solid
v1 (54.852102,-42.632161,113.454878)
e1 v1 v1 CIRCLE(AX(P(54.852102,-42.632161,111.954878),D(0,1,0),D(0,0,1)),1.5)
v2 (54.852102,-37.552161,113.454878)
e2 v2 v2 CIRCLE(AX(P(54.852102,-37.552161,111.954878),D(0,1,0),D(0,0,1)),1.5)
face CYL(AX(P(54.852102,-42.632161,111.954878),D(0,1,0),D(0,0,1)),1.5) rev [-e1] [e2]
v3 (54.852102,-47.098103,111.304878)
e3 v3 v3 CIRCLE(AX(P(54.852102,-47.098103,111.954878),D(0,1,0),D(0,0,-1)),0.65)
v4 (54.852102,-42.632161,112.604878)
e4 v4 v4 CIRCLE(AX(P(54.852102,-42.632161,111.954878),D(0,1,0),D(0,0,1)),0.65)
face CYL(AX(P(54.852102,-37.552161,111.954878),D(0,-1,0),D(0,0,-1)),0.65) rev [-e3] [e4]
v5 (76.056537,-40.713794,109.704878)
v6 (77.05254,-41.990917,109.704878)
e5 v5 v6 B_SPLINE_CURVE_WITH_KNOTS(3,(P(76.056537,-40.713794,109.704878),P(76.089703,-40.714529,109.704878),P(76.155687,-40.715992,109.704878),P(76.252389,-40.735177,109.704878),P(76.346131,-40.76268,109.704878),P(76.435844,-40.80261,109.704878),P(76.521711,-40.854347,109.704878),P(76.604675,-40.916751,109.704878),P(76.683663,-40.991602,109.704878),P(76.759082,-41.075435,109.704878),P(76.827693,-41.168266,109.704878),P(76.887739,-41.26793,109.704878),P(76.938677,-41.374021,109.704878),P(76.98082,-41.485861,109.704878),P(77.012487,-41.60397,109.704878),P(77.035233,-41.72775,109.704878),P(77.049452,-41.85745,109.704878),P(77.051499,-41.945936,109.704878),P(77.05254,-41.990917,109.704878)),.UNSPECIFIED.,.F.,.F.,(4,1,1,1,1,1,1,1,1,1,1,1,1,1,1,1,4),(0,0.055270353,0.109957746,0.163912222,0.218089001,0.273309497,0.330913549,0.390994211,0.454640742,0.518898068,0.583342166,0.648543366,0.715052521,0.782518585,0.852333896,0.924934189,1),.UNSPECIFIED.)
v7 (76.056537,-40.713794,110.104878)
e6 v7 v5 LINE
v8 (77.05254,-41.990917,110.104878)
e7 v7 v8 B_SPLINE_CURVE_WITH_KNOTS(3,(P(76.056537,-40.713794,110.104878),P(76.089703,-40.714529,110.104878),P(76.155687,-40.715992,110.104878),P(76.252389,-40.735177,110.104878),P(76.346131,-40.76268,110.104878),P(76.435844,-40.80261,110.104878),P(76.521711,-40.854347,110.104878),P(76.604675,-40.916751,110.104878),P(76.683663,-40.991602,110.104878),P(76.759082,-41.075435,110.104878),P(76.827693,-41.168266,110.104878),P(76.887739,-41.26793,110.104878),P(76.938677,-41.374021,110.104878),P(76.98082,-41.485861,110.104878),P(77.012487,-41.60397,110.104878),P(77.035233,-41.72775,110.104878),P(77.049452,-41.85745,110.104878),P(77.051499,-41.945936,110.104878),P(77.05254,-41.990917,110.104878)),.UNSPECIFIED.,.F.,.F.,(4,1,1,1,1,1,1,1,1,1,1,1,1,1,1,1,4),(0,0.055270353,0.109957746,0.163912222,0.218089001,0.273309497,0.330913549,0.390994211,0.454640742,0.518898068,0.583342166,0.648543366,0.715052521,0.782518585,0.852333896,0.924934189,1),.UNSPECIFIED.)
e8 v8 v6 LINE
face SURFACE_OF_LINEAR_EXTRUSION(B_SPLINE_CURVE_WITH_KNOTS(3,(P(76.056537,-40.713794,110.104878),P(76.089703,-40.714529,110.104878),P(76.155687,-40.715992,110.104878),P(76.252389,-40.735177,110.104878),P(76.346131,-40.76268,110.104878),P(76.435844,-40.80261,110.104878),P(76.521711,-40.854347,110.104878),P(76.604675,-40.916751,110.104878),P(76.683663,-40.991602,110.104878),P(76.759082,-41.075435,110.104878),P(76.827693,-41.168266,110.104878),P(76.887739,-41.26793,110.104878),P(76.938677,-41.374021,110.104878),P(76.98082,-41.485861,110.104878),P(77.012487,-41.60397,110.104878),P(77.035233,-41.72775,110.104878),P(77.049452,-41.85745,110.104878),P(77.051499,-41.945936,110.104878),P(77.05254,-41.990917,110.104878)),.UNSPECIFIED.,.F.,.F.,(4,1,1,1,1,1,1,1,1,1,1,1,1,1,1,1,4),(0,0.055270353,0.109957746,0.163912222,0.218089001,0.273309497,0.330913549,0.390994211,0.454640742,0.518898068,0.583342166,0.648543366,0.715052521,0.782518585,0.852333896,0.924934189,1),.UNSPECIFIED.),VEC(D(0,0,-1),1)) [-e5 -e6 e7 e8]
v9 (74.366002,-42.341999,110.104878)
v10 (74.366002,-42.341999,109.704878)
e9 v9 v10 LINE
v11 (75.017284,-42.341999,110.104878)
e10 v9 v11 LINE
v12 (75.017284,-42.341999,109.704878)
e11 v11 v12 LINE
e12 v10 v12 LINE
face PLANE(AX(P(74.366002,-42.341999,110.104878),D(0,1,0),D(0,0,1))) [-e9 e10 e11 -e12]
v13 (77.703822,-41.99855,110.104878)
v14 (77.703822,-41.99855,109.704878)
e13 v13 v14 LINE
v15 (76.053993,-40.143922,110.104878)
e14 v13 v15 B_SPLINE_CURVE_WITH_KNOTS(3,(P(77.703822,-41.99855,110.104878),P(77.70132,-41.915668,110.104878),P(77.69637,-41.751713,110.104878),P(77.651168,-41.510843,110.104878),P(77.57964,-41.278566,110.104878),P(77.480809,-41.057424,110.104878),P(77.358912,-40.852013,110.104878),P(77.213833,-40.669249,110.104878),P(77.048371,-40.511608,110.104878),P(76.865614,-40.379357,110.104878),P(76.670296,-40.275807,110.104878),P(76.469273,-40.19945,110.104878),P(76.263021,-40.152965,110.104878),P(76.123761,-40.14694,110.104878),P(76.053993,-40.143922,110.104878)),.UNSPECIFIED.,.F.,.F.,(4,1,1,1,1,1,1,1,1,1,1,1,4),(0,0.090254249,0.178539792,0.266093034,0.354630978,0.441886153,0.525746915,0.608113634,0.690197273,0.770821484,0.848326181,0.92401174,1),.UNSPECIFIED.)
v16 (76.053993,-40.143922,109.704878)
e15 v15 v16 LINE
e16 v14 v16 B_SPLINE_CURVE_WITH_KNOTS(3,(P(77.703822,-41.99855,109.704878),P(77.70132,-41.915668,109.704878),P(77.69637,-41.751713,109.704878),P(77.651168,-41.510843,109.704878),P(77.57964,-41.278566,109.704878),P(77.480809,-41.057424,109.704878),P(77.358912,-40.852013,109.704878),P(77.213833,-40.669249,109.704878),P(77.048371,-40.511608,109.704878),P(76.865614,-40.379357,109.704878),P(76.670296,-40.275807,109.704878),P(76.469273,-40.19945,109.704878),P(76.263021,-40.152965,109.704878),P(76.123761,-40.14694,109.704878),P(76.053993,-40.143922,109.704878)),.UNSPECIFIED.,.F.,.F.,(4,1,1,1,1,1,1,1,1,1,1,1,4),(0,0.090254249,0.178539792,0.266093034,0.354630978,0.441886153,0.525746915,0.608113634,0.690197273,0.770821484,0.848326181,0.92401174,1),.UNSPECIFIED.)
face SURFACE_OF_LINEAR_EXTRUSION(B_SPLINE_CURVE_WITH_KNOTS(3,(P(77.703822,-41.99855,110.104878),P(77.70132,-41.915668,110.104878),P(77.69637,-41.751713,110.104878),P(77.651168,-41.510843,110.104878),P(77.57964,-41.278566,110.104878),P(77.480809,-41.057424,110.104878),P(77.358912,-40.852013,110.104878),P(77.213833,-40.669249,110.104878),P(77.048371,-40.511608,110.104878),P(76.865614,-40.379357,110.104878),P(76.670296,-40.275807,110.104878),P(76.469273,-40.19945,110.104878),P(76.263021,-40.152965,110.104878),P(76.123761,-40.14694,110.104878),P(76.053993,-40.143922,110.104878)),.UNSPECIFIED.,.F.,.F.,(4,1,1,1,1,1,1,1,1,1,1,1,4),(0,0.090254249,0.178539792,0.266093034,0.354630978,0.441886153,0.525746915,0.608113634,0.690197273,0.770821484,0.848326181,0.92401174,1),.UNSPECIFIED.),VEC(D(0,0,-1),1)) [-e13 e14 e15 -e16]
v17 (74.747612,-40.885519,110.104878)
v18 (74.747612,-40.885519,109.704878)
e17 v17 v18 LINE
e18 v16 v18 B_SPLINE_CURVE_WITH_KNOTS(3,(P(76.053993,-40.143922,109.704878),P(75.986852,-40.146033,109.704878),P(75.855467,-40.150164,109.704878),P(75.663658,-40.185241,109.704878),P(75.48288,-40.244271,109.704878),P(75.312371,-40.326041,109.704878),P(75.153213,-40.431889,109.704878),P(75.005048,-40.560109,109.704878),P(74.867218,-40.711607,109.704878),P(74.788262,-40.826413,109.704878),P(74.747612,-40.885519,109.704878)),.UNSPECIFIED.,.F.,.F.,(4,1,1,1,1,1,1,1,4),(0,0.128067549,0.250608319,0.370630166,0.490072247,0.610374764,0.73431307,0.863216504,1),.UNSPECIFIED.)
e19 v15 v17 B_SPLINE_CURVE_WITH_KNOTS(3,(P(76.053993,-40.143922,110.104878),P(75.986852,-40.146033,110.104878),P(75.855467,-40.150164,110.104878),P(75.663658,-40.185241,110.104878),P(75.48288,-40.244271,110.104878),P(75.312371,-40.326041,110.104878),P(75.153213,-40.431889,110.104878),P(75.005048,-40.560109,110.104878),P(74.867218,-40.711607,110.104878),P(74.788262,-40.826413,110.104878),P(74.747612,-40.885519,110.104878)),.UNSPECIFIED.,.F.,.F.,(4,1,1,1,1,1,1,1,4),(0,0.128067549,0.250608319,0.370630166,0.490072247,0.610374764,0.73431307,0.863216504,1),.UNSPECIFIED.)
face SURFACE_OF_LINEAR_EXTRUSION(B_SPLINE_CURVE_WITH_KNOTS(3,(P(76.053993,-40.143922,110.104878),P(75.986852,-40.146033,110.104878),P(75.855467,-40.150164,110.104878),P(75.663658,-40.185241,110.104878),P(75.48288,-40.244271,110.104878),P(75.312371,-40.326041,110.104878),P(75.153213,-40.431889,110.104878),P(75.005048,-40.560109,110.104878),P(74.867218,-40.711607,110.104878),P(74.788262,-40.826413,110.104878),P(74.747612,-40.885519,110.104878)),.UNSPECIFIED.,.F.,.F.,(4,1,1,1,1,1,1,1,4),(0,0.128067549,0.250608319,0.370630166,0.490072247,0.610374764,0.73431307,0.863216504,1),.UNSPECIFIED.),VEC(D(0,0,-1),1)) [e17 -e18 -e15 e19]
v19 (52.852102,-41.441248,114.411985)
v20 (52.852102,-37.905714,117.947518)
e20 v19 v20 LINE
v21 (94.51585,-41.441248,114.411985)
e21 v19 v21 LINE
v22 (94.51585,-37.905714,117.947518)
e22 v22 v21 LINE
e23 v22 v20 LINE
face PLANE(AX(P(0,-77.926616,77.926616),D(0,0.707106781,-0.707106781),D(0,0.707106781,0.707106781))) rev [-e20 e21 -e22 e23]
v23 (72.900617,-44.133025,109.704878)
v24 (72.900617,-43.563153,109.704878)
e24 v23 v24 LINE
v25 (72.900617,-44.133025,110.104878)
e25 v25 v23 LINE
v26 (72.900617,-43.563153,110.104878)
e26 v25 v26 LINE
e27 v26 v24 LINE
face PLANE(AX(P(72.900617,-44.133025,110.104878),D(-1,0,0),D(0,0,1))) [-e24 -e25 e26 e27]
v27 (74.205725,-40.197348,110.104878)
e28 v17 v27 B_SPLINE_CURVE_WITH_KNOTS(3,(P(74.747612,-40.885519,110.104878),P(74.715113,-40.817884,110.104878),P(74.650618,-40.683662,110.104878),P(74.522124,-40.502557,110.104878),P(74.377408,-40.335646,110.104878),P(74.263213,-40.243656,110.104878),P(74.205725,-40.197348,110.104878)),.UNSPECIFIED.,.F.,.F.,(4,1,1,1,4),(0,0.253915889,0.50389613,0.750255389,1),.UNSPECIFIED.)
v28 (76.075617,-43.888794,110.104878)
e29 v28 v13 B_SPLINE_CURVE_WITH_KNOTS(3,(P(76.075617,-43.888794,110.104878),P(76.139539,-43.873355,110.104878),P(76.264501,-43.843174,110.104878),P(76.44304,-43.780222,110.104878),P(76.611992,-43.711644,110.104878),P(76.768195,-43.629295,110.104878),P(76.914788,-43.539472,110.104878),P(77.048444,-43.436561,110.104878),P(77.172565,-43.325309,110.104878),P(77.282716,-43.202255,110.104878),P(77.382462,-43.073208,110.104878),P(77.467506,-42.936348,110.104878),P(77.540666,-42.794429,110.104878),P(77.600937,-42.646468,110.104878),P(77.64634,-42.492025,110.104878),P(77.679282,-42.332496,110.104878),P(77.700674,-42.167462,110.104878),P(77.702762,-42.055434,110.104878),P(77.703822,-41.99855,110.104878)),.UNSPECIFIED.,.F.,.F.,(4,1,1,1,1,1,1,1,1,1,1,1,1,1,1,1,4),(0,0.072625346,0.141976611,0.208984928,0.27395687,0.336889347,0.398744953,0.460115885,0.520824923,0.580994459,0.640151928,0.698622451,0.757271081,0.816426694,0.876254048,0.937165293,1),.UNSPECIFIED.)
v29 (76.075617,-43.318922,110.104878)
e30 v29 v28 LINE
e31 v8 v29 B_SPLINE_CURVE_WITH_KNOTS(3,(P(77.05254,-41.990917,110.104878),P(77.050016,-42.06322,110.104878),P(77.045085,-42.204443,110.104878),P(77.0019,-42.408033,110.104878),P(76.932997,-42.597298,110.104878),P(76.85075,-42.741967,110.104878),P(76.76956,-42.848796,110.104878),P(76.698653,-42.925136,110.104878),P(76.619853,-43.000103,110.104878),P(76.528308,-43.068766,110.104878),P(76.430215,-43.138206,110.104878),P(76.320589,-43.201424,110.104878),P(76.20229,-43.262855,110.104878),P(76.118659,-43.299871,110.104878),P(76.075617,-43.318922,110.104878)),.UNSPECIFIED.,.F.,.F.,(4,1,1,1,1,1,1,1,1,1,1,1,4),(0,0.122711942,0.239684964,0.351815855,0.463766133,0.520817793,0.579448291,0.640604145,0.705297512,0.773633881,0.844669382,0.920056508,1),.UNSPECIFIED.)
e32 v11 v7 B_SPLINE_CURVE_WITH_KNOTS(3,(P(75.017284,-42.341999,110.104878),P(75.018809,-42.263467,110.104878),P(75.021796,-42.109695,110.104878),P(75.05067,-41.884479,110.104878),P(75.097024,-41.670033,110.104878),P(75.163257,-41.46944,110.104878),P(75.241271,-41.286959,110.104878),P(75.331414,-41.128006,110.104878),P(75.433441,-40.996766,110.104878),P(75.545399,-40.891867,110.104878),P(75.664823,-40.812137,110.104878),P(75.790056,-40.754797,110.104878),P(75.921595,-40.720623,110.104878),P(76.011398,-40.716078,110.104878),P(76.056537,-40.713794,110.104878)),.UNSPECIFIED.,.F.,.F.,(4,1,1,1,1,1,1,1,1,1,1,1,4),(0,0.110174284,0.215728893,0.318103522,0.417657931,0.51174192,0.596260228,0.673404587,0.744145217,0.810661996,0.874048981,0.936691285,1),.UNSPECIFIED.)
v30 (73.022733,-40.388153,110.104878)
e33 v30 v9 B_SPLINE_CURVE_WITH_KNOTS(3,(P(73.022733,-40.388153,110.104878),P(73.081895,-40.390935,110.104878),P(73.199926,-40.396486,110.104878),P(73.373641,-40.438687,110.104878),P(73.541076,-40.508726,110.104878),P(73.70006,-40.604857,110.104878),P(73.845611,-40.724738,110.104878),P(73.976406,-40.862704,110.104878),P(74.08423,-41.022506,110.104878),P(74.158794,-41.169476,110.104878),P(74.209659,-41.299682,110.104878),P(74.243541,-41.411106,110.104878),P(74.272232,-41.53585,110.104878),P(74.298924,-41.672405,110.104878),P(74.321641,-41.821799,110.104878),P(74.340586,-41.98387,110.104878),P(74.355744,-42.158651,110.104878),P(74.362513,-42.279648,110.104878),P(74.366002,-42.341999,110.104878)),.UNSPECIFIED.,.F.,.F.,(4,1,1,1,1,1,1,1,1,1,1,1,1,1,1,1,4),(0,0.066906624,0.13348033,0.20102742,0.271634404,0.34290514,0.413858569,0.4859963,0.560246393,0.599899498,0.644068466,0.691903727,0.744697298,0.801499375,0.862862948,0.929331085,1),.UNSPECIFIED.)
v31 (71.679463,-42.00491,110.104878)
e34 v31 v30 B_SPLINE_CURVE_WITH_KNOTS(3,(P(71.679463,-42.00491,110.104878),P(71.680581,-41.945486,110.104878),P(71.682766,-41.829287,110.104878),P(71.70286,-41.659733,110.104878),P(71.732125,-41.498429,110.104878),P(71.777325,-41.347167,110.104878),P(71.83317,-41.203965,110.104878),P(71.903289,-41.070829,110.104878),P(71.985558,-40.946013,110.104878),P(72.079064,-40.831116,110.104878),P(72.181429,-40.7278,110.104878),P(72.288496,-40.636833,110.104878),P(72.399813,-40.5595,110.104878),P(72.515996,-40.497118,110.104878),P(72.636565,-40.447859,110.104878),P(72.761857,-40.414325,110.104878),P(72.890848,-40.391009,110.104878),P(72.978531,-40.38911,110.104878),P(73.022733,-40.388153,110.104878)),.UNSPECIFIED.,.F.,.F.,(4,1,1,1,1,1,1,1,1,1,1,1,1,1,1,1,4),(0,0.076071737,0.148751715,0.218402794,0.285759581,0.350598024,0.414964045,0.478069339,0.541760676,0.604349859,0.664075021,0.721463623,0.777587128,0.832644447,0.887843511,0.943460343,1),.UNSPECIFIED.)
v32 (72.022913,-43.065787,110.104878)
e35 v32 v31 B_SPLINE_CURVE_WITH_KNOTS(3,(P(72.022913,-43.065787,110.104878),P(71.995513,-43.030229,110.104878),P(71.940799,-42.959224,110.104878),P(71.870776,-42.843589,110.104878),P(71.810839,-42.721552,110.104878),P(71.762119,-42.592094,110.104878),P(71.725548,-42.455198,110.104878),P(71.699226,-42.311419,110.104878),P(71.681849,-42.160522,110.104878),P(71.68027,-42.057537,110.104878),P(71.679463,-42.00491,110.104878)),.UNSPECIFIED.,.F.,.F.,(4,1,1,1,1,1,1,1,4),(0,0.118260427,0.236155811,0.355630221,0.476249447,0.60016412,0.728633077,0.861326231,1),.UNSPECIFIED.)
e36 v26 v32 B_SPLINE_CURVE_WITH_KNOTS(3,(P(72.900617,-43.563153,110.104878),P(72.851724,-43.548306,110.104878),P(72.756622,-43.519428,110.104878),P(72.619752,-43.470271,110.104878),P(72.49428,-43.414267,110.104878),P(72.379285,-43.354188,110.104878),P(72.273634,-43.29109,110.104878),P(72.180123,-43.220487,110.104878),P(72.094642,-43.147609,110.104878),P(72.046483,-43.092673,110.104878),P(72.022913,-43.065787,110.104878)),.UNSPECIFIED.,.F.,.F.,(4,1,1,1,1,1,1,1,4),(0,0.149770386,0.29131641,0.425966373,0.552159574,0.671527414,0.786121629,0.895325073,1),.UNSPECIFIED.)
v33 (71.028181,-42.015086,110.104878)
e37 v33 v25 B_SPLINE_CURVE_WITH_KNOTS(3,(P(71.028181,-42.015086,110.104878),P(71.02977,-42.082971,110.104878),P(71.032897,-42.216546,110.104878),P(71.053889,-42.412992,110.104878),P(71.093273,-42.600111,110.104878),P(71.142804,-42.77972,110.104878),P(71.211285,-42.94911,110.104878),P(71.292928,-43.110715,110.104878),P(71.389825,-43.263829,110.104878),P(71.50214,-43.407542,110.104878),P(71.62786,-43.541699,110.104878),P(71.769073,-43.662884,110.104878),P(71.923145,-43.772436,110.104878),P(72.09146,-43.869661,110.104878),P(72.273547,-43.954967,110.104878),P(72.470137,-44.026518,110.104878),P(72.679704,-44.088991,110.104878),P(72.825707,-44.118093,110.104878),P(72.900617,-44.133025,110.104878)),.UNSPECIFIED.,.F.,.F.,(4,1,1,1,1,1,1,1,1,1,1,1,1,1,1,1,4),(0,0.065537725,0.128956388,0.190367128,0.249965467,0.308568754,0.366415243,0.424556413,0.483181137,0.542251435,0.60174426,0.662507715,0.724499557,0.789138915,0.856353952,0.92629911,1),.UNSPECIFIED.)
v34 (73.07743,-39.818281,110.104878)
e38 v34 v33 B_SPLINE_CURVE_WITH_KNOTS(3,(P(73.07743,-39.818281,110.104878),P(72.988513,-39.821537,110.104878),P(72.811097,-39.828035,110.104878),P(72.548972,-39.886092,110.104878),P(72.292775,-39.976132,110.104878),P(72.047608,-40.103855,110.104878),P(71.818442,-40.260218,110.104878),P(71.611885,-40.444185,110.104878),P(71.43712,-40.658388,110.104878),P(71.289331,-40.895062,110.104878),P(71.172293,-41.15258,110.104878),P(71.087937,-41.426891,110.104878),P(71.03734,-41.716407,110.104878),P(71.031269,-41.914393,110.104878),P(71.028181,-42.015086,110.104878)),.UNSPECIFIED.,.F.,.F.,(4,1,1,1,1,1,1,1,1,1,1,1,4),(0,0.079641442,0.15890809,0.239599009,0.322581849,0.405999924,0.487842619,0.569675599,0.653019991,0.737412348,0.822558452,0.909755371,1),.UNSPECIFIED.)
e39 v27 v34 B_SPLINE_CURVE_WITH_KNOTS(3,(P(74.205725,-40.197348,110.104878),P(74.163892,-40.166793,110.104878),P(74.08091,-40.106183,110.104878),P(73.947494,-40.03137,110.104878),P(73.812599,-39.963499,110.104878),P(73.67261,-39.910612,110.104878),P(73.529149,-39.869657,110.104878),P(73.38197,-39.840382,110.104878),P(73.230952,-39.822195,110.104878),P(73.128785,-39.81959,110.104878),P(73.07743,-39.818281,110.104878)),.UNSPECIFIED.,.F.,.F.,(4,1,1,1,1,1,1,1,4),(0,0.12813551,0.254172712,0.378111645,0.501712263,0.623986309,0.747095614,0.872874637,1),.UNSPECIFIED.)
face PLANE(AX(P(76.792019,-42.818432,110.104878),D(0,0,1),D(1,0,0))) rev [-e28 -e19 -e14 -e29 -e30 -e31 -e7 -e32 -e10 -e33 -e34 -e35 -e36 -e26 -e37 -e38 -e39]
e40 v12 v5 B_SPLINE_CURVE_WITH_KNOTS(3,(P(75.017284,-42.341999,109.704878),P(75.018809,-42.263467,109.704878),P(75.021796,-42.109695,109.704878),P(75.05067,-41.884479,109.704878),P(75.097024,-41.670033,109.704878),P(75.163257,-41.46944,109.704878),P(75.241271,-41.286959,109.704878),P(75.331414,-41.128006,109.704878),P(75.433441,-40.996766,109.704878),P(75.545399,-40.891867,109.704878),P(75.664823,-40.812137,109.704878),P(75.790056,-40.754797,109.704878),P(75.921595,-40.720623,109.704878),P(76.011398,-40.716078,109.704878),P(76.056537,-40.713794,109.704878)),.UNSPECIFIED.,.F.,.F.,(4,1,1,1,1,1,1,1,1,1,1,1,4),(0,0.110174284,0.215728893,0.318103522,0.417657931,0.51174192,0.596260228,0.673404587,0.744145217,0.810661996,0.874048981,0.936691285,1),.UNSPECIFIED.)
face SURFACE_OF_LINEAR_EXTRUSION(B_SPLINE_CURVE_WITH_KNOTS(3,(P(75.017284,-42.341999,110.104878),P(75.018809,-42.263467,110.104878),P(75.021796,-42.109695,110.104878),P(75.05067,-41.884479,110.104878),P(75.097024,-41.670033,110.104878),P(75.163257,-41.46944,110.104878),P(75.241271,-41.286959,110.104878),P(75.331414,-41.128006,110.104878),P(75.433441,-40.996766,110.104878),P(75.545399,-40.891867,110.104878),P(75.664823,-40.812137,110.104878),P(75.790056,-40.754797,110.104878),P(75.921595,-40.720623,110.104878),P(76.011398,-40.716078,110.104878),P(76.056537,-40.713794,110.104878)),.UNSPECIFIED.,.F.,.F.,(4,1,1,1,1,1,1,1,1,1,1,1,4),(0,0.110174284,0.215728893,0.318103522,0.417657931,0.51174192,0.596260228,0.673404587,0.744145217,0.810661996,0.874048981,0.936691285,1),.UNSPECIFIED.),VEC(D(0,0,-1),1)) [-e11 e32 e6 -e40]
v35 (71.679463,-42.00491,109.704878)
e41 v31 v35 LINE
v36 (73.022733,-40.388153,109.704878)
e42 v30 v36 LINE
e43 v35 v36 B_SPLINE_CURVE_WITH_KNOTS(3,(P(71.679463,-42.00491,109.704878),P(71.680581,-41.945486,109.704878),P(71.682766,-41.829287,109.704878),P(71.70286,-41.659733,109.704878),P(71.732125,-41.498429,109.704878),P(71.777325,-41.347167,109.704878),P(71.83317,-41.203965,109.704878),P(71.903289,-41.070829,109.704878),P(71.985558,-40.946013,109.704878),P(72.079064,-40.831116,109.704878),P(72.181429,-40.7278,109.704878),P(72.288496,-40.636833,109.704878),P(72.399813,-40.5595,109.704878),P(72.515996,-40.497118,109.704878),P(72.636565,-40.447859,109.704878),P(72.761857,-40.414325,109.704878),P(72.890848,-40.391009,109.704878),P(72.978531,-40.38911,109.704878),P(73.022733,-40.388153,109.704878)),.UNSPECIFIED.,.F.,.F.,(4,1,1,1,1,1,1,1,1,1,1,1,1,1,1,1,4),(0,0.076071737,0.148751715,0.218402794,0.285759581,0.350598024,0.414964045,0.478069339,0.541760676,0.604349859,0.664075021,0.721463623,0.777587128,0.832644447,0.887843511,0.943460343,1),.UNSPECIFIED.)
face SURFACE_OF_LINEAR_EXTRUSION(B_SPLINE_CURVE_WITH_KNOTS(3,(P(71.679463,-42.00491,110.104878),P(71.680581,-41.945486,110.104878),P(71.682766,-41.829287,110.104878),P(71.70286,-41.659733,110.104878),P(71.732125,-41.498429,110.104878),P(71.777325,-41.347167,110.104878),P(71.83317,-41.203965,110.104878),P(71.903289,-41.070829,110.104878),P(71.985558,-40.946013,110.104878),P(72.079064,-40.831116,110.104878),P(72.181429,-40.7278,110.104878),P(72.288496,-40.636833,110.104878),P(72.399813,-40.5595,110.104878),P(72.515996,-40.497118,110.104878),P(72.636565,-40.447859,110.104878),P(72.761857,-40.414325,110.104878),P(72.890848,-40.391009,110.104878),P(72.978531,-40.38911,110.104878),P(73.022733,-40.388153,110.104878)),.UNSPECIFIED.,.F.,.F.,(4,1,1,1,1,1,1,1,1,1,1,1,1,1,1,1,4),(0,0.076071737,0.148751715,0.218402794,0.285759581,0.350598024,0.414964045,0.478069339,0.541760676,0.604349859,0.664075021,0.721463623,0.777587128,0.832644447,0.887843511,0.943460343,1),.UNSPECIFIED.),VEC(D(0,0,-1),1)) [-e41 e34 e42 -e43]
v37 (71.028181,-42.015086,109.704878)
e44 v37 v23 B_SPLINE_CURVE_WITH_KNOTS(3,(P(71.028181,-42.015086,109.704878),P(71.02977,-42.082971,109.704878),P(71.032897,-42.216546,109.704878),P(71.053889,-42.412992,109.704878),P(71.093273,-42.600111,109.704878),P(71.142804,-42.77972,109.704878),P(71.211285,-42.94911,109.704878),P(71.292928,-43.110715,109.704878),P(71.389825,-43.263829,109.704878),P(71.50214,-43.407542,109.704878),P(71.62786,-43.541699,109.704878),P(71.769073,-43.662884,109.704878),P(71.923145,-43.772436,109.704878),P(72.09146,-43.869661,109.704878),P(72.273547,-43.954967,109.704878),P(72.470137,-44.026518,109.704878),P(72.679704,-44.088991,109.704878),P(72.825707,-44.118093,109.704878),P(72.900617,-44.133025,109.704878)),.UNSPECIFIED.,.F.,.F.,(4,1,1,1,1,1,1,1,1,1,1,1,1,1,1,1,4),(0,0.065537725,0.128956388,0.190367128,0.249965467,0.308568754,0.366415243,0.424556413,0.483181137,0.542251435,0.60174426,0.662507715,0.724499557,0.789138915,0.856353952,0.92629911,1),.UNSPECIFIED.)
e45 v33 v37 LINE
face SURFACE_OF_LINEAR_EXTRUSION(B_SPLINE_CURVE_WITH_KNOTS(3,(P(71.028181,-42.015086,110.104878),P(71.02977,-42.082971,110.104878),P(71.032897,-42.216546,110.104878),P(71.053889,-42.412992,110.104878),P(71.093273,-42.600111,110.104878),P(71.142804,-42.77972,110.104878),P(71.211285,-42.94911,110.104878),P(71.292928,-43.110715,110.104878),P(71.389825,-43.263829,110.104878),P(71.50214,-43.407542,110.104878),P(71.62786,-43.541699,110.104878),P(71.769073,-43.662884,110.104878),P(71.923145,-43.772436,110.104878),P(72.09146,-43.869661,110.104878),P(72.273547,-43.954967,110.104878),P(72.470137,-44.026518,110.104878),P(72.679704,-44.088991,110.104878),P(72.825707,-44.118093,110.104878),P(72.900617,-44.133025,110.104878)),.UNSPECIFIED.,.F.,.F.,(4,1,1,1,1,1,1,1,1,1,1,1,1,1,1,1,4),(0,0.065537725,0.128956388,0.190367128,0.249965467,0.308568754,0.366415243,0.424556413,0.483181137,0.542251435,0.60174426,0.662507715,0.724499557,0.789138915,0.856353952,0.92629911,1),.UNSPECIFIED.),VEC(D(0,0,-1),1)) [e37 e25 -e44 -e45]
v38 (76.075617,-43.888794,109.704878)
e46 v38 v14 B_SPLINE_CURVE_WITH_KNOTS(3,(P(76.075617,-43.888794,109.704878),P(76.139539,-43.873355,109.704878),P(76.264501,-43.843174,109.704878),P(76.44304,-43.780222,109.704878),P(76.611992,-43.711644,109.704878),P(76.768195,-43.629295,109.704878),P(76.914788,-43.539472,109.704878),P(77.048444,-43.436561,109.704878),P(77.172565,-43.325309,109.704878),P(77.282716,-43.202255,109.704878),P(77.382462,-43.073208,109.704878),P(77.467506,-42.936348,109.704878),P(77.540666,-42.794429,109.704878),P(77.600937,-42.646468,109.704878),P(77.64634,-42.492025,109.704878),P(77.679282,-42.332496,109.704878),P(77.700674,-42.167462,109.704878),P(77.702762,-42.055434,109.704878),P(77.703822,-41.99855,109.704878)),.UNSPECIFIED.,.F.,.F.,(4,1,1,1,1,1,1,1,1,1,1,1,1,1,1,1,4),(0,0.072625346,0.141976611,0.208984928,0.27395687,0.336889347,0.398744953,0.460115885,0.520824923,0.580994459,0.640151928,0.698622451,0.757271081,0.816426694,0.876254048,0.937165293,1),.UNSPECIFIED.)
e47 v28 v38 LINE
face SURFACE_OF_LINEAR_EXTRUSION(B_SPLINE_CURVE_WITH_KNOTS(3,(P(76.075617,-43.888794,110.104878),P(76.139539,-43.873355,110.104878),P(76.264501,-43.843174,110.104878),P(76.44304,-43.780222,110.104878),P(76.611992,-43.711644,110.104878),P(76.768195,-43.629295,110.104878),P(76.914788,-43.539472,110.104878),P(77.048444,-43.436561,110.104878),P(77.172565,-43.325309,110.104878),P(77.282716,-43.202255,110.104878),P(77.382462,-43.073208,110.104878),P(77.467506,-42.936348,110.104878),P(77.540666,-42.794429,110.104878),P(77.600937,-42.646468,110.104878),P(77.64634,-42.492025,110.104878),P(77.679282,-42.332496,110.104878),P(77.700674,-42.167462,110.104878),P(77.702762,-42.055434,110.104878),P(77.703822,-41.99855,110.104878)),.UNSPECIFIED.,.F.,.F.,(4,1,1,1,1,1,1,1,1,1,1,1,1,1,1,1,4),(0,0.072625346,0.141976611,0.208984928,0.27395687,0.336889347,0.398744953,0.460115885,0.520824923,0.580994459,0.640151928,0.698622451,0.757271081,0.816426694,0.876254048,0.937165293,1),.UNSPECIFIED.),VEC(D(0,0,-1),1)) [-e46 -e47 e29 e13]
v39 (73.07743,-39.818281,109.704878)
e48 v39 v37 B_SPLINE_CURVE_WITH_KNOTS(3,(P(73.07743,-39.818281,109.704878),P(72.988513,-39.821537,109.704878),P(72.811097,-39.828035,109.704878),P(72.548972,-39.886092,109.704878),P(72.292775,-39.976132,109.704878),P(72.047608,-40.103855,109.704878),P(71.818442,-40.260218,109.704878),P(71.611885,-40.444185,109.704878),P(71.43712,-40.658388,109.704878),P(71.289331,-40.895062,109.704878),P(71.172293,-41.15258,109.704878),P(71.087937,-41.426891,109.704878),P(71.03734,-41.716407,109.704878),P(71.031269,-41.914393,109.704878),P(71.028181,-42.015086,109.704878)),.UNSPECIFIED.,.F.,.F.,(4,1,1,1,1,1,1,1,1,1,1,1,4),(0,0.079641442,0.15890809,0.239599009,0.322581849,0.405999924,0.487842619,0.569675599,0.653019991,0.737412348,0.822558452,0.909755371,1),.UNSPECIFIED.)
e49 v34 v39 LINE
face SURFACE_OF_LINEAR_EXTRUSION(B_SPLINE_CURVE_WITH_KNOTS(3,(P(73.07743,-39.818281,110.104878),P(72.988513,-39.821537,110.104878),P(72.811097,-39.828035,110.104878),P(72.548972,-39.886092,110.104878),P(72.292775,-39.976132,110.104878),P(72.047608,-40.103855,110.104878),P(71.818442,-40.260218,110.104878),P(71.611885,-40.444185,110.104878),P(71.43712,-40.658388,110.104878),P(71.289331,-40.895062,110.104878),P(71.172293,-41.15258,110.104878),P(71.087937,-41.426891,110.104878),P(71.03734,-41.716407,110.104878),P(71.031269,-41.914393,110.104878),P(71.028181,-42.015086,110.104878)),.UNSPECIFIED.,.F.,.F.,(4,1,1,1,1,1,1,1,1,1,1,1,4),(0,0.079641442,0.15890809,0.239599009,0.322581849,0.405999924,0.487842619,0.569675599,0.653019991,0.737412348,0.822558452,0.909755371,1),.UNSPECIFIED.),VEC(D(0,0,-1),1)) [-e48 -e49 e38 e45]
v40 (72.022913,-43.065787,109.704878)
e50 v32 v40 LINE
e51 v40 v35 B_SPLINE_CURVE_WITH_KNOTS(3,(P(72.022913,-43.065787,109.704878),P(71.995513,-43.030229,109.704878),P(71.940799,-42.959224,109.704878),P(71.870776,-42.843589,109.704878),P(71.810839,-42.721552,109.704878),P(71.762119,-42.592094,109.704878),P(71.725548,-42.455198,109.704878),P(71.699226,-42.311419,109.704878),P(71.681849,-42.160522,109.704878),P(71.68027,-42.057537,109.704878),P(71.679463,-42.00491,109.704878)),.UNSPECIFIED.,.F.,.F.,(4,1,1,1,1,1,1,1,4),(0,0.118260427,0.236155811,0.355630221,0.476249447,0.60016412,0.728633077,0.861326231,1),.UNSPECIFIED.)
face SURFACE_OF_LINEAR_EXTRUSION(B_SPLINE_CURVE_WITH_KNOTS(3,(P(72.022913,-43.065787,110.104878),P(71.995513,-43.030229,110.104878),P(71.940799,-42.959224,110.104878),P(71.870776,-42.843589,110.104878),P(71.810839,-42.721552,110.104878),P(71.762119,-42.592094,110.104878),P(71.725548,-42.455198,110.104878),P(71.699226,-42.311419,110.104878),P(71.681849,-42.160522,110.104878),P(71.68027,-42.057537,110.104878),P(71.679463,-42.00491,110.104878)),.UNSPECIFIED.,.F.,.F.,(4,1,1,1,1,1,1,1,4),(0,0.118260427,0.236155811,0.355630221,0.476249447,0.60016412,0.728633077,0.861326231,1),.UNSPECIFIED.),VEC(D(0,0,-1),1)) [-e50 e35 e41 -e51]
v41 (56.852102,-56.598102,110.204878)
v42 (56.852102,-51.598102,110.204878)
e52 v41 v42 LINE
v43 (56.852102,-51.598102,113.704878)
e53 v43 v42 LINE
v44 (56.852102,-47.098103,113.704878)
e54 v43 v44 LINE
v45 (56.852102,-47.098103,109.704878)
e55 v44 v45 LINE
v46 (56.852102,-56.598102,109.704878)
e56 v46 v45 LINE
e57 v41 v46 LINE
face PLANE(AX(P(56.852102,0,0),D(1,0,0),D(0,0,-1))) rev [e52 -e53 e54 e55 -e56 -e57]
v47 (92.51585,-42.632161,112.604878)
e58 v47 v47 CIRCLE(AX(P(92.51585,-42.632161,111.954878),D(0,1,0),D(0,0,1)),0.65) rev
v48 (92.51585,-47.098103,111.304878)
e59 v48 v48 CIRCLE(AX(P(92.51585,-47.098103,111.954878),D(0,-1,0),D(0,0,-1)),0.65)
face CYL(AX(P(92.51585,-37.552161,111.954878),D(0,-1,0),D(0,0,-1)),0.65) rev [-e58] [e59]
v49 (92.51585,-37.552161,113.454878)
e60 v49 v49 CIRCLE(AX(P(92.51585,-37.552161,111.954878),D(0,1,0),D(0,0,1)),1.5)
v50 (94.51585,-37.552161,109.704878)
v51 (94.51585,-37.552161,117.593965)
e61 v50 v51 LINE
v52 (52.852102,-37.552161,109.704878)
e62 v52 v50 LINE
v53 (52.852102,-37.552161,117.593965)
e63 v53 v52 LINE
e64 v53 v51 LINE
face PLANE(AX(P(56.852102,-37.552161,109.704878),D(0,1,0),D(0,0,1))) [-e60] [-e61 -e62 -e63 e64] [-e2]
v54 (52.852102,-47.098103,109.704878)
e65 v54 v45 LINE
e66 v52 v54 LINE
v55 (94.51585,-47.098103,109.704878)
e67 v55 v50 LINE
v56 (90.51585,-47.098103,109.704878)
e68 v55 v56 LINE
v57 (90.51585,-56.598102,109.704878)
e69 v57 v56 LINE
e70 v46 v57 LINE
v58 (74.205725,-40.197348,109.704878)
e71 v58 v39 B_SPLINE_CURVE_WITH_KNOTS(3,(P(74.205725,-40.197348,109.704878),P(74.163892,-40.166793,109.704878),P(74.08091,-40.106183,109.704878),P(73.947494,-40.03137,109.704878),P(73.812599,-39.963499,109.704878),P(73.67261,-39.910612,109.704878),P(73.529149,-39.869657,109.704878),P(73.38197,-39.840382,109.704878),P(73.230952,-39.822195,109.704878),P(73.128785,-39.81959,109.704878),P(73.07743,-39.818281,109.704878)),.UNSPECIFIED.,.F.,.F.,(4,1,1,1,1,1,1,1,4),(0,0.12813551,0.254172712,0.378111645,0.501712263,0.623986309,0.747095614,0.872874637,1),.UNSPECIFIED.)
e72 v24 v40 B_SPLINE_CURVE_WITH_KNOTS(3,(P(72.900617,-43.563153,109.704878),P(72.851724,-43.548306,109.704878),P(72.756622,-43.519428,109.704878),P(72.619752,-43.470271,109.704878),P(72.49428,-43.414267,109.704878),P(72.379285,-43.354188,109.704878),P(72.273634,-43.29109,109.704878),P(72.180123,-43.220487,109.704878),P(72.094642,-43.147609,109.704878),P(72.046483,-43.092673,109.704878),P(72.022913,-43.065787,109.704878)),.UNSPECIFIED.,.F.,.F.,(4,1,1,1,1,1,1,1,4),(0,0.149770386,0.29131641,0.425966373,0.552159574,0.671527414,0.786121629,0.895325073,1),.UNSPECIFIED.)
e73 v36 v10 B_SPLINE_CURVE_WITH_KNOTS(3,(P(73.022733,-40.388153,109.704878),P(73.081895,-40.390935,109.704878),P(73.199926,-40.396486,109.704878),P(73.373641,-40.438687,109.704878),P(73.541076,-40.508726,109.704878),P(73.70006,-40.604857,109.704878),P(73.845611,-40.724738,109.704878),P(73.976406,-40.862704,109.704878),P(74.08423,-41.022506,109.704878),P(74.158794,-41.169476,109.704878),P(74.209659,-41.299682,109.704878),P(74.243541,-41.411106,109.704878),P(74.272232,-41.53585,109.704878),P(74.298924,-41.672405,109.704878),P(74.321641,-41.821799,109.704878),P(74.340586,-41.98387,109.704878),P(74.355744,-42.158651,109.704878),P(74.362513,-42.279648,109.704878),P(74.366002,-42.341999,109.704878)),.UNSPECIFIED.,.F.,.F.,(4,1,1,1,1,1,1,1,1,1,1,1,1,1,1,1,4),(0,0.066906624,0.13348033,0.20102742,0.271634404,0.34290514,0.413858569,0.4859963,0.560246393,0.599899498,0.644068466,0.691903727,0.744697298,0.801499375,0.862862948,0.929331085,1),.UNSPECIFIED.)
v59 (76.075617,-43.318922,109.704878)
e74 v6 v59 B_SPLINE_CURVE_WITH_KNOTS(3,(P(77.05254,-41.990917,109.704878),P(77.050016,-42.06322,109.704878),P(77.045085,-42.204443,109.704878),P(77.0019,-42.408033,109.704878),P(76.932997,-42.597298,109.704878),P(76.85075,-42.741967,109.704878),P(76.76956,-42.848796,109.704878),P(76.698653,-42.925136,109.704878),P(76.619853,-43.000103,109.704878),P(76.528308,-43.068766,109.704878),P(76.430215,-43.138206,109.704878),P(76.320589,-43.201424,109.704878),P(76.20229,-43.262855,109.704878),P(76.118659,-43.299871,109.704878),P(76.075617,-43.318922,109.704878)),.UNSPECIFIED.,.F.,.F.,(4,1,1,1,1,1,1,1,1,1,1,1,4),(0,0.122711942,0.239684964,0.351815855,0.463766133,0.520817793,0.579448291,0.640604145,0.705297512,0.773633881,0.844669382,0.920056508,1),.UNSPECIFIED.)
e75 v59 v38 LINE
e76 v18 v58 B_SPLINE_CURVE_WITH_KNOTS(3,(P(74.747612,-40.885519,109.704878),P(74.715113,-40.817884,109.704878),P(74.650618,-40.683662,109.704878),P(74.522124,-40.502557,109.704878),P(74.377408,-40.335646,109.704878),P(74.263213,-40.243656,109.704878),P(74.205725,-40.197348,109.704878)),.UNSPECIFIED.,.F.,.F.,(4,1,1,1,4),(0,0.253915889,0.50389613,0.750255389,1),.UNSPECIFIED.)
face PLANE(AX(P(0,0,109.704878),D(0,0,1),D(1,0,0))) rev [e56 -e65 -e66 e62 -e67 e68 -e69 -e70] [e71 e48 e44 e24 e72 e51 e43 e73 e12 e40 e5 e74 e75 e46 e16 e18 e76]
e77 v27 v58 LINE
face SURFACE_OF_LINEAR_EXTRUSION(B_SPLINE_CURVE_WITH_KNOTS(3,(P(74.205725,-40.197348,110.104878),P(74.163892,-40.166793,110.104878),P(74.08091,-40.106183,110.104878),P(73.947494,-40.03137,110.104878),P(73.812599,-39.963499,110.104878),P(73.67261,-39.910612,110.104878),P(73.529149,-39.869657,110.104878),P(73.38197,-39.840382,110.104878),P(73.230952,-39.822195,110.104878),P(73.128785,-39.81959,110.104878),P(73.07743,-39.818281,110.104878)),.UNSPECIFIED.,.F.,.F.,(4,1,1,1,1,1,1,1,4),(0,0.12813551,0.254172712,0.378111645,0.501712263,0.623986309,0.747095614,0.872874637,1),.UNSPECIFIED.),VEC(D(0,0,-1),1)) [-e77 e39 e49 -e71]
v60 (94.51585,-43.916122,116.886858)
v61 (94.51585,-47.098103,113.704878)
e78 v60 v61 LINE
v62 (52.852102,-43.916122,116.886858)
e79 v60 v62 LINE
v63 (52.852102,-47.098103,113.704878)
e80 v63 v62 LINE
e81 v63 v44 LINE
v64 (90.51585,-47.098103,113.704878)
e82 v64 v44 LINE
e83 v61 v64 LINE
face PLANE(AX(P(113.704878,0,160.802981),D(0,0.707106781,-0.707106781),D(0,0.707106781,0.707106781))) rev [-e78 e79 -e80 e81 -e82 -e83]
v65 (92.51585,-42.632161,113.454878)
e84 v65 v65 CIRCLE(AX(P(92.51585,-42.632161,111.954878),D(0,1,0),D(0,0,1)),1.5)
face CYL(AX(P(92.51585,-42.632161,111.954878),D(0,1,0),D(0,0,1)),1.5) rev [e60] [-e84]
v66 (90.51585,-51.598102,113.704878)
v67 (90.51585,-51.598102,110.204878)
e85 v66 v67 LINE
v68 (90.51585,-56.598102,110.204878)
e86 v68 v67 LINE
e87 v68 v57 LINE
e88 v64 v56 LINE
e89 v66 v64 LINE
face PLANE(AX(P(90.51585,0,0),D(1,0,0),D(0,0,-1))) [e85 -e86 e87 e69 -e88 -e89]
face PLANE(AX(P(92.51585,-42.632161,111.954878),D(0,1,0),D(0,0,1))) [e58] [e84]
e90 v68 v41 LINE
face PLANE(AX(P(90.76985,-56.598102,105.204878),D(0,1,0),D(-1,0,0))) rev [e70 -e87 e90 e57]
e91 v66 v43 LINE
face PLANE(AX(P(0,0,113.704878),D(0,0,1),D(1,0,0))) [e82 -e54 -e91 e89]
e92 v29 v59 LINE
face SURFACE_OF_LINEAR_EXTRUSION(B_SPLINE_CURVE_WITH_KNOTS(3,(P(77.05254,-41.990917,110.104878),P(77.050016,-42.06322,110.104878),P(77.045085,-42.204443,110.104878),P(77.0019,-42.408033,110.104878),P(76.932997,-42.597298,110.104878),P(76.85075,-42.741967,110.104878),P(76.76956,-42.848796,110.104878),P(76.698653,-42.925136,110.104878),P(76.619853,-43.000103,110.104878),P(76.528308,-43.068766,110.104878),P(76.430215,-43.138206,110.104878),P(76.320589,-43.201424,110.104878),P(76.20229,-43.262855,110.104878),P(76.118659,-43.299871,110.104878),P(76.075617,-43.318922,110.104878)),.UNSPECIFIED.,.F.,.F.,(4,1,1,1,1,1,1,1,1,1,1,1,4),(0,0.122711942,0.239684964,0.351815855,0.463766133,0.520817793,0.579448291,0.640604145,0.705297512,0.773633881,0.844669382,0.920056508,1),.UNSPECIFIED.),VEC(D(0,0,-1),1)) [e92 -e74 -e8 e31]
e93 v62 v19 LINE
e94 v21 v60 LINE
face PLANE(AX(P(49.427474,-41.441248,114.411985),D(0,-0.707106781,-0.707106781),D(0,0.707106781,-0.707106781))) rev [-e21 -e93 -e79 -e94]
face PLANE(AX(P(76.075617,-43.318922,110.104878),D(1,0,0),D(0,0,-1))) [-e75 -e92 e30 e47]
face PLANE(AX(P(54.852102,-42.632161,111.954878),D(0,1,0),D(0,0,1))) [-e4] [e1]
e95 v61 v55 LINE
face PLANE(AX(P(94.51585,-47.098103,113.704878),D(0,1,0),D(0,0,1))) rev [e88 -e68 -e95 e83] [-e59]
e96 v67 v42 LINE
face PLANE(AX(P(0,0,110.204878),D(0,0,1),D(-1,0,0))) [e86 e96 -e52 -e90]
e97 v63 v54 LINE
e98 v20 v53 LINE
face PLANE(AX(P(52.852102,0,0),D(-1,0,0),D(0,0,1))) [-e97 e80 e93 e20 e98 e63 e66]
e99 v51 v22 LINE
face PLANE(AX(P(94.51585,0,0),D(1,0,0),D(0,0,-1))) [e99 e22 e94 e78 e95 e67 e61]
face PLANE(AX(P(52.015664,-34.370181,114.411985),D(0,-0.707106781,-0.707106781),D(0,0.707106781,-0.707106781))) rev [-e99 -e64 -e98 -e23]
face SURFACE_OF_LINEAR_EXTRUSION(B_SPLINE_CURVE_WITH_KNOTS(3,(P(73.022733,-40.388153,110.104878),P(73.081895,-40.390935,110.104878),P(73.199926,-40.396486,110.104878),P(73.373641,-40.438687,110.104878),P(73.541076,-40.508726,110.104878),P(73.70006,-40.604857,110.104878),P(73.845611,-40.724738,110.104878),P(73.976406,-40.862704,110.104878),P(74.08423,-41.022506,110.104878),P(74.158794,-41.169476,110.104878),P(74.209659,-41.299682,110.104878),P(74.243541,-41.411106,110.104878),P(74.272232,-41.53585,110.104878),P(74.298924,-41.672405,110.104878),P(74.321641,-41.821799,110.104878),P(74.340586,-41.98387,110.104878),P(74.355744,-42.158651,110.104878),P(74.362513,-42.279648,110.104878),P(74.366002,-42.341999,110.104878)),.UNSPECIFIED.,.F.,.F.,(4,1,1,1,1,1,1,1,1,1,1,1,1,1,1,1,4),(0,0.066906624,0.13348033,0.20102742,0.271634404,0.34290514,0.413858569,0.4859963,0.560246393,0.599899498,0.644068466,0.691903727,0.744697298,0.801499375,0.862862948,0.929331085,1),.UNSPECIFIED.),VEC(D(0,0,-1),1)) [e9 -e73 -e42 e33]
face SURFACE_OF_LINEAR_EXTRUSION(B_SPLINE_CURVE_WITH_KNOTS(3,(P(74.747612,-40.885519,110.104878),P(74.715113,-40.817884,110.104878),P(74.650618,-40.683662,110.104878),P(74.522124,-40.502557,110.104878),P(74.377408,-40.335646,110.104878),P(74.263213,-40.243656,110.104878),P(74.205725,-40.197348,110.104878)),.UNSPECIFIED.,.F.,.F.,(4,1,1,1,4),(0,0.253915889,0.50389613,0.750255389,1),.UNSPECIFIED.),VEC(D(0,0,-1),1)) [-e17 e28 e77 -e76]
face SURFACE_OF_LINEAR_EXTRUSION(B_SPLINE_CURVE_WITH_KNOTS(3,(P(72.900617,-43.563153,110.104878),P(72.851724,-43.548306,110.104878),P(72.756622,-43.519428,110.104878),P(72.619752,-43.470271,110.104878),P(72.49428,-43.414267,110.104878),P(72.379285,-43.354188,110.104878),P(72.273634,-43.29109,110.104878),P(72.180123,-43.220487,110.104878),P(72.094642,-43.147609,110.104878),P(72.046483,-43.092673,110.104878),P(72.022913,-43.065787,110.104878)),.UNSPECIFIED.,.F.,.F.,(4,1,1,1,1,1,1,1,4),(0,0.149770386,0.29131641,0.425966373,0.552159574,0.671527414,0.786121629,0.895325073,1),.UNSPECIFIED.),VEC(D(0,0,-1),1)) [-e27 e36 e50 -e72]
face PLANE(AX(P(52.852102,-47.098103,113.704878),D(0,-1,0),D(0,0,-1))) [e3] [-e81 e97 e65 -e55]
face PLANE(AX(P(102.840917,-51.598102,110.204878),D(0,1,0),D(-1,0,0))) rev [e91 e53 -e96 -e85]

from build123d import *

# Parameters (mm, degrees)
STOCK_GOUX_START         = 56.852102372
STOCK_GOUX_LIKED_1_DEPTH = 33.663747278
BOSS_EXTRUDE1_DEPTH      = 33.663747
BOSS_EXTRUDE2_DEPTH      = 4
BOSS_EXTRUDE3_DEPTH      = 4
SKETCH4_R                = 0.64999997
CUT_EXTRUDE1_DEPTH       = 152.446320344
CUT_EXTRUDE2_DEPTH       = 0.4
SKETCH6_R                = 1.5
CUT_EXTRUDE3_DEPTH       = 5.08


# Read off the part's stored shape, not the designer's step: Stock-Goux Liked-1
with BuildPart() as part:
    # Stock-Goux Liked-1 outline → Stock-Goux Liked-1 (new body)
    with BuildSketch(Plane.YZ.offset(STOCK_GOUX_START)):
        Polygon((-51.598102466, 113.704878), (-51.598102466, 110.204877888), (-56.598102372, 110.204877888), (-56.598102372, 109.704877872), (-45.441248273, 109.704877872), (-37.552161083, 117.593965062), (-37.905714485, 117.947518464), (-41.441248325, 114.411984624), (-43.916122138, 116.886858438), (-47.098102576, 113.704878), align=None)
    extrude(amount=STOCK_GOUX_LIKED_1_DEPTH)

    # Sketch1 → Boss-Extrude1 (add)
    with BuildSketch(Plane(origin=(90.51584965, 0, 0), x_dir=(0, 0, -1), z_dir=(1, 0, 0))):
        Polygon((-109.704877872, -45.441248273), (-109.704877872, -37.552161083), (-117.593965062, -37.552161083), align=None)
    extrude(amount=-BOSS_EXTRUDE1_DEPTH)

    # Sketch2 → Boss-Extrude2 (add)
    with BuildSketch(Plane.ZY.offset(-56.852102372)):
        Polygon((113.704878, -47.098102576), (109.704877872, -47.098102576), (109.704877872, -37.552161083), (117.593965062, -37.552161083), (117.947518464, -37.905714485), (114.411984624, -41.441248325), (116.886858438, -43.916122138), align=None)
    extrude(amount=BOSS_EXTRUDE2_DEPTH)

    # Sketch3 → Boss-Extrude3 (add)
    with BuildSketch(Plane(origin=(90.51584965, 0, 0), x_dir=(0, 0, -1), z_dir=(1, 0, 0))):
        Polygon((-113.704878, -47.098102576), (-109.704877872, -47.098102576), (-109.704877872, -37.552161083), (-117.593965062, -37.552161083), (-117.947518464, -37.905714485), (-114.411984624, -41.441248325), (-116.886858438, -43.916122138), align=None)
    extrude(amount=BOSS_EXTRUDE3_DEPTH)

    # Sketch4 → Cut-Extrude1 (cut, through all)
    with BuildSketch(Plane.XZ.offset(47.098102576)):
        with Locations(Location((92.51584965, 111.954877944, 0), (0, 0, 270))):
            Circle(SKETCH4_R)
    cut_extrude1 = extrude(amount=-CUT_EXTRUDE1_DEPTH, mode=Mode.SUBTRACT)

    # Mirror2: Cut-Extrude1 across plane
    add(cut_extrude1.mirror(Plane(origin=(73.683976011, 0, 0), x_dir=(0, 0, 1), z_dir=(1, 0, 0))), mode=Mode.SUBTRACT)

    # Sketch5 → Cut-Extrude2 (cut)
    with BuildSketch(Plane(origin=(0, 0, 109.704877872), x_dir=(-1, 0, 0), z_dir=(0, 0, -1))):
        with BuildLine():
            Line((-76.075617186, -43.318922194), (-76.075617186, -43.888793989))
            add(Edge.make_bspline(
                [(-76.075617186, -43.888793989), (-76.139538978, -43.873355233), (-76.264500854, -43.843173727), (-76.443039741, -43.780222416), (-76.611992416, -43.711643767), (-76.768195292, -43.629294963), (-76.914787587, -43.539471937), (-77.048444427, -43.436560714), (-77.172565093, -43.325309217), (-77.282716253, -43.202255381), (-77.382461562, -43.073207666), (-77.467506308, -42.936347713), (-77.540665843, -42.794429035), (-77.600936835, -42.646468351), (-77.646340285, -42.492025153), (-77.679281918, -42.332495694), (-77.700674368, -42.167461915), (-77.702762181, -42.055434144), (-77.703822314, -41.998549598)],
                knots=[0, 0, 0, 0, 1.162005537, 2.271625781, 3.343758855, 4.383309926, 5.390229558, 6.379919256, 7.361854164, 8.333198761, 9.295911338, 10.242430842, 11.177959212, 12.116337295, 13.062827104, 14.020064771, 14.994644689, 16, 16, 16, 16], degree=3))
            add(Edge.make_bspline(
                [(-77.703822314, -41.998549598), (-77.701319996, -41.915668052), (-77.696369943, -41.751712846), (-77.651168037, -41.510842747), (-77.579639583, -41.278565518), (-77.480808678, -41.057423597), (-77.358911695, -40.852013012), (-77.213832816, -40.669248788), (-77.048371226, -40.511608204), (-76.865613573, -40.379356976), (-76.670295721, -40.27580662), (-76.469272578, -40.199449914), (-76.263021002, -40.152964864), (-76.123761367, -40.146940425), (-76.053992586, -40.143922194)],
                knots=[0, 0, 0, 0, 1.083050992, 2.142477498, 3.193116406, 4.255571735, 5.30263384, 6.308962982, 7.297363603, 8.282367274, 9.249857812, 10.179914175, 11.08814088, 12, 12, 12, 12], degree=3))
            add(Edge.make_bspline(
                [(-76.053992586, -40.143922194), (-75.986851687, -40.146033281), (-75.855467367, -40.15016435), (-75.663658365, -40.185241216), (-75.482880033, -40.244271293), (-75.312371353, -40.326040719), (-75.15321343, -40.43188896), (-75.00504817, -40.560109425), (-74.867218412, -40.711607111), (-74.788261654, -40.826413184), (-74.747612378, -40.885518749)],
                knots=[0, 0, 0, 0, 1.024540389, 2.004866551, 2.965041327, 3.920577974, 4.882998113, 5.874504559, 6.905732034, 8, 8, 8, 8], degree=3))
            add(Edge.make_bspline(
                [(-74.747612378, -40.885518749), (-74.715113083, -40.817883608), (-74.650618225, -40.683661659), (-74.522124234, -40.502557078), (-74.377408106, -40.335645539), (-74.263212693, -40.243656204), (-74.205725359, -40.197347675)],
                knots=[0, 0, 0, 0, 1.015663554, 2.015584519, 3.001021554, 4, 4, 4, 4], degree=3))
            add(Edge.make_bspline(
                [(-74.205725359, -40.197347675), (-74.163892009, -40.166792668), (-74.080910361, -40.106183014), (-73.947494274, -40.031369974), (-73.812599429, -39.963499153), (-73.672610221, -39.910612326), (-73.529149182, -39.869656882), (-73.381969977, -39.840381509), (-73.230952422, -39.822194854), (-73.128785494, -39.819590352), (-73.077430086, -39.818281169)],
                knots=[0, 0, 0, 0, 1.025084078, 2.033381695, 3.024893161, 4.013698104, 4.991890475, 5.976764909, 6.982997093, 8, 8, 8, 8], degree=3))
            add(Edge.make_bspline(
                [(-73.077430086, -39.818281169), (-72.988512904, -39.821537398), (-72.811096985, -39.828034533), (-72.548971743, -39.88609203), (-72.292774916, -39.976132066), (-72.04760793, -40.103855132), (-71.81844159, -40.260217785), (-71.611884948, -40.444185319), (-71.437120387, -40.658387778), (-71.289330919, -40.895062092), (-71.172293376, -41.152579903), (-71.08793697, -41.426890731), (-71.037340068, -41.716407105), (-71.031268974, -41.914392881), (-71.028181288, -42.015086057)],
                knots=[0, 0, 0, 0, 0.955697303, 1.906897079, 2.875188111, 3.870982192, 4.871999088, 5.854111427, 6.836107184, 7.836239895, 8.848948182, 9.870701427, 10.917064451, 12, 12, 12, 12], degree=3))
            add(Edge.make_bspline(
                [(-71.028181288, -42.015086057), (-71.029770214, -42.082971085), (-71.03289669, -42.216546184), (-71.053889344, -42.412991677), (-71.093273096, -42.600110727), (-71.142803615, -42.779720334), (-71.211285106, -42.949109752), (-71.292927731, -43.110715491), (-71.389825107, -43.263829176), (-71.502140187, -43.407541515), (-71.627860123, -43.541698969), (-71.769073476, -43.662883652), (-71.923144715, -43.772436343), (-72.091459735, -43.869660957), (-72.273547112, -43.954966676), (-72.4701365, -44.026517714), (-72.679703854, -44.088990608), (-72.825706955, -44.118093073), (-72.900617186, -44.133024759)],
                knots=[0, 0, 0, 0, 1.048603596, 2.063302207, 3.045874044, 3.999447474, 4.937100059, 5.862643889, 6.7929026, 7.7308982, 8.676022965, 9.627908155, 10.600123445, 11.591992905, 12.626222643, 13.701663232, 14.820785756, 16, 16, 16, 16], degree=3))
            Line((-72.900617186, -44.133024759), (-72.900617186, -43.563152964))
            add(Edge.make_bspline(
                [(-72.900617186, -43.563152964), (-72.851723976, -43.548306135), (-72.756622436, -43.519427763), (-72.619752167, -43.470270966), (-72.494279699, -43.414267101), (-72.379284606, -43.35418783), (-72.27363439, -43.291089792), (-72.180122714, -43.220486999), (-72.094642275, -43.147608693), (-72.046482765, -43.092673295), (-72.022912859, -43.065787178)],
                knots=[0, 0, 0, 0, 1.198163088, 2.33053128, 3.407730985, 4.417276592, 5.372219308, 6.28897303, 7.162600585, 8, 8, 8, 8], degree=3))
            add(Edge.make_bspline(
                [(-72.022912859, -43.065787178), (-71.995513327, -43.030229419), (-71.94079884, -42.959223657), (-71.870776253, -42.843589465), (-71.810838593, -42.721552229), (-71.762118751, -42.592094244), (-71.72554788, -42.455198144), (-71.699225888, -42.311419238), (-71.681849284, -42.16052162), (-71.680270254, -42.057536944), (-71.679463339, -42.004909775)],
                knots=[0, 0, 0, 0, 0.946083416, 1.889246487, 2.84504177, 3.809995578, 4.801312957, 5.829064617, 6.89060985, 8, 8, 8, 8], degree=3))
            add(Edge.make_bspline(
                [(-71.679463339, -42.004909775), (-71.680580768, -41.945485563), (-71.682765802, -41.829286646), (-71.702860298, -41.65973283), (-71.732125477, -41.498429318), (-71.777324746, -41.34716701), (-71.833170005, -41.203964518), (-71.903289255, -41.070829239), (-71.985557536, -40.946013447), (-72.079064295, -40.831115811), (-72.181429007, -40.72780039), (-72.288495579, -40.636832988), (-72.399812584, -40.559499673), (-72.515996032, -40.497118038), (-72.636564804, -40.447859183), (-72.761857252, -40.414325376), (-72.890848006, -40.391009056), (-72.978530564, -40.389110202), (-73.02273257, -40.388152964)],
                knots=[0, 0, 0, 0, 1.217147791, 2.380027433, 3.494444702, 4.572153297, 5.609568379, 6.639424714, 7.649109417, 8.668170816, 9.669597737, 10.625200337, 11.543417969, 12.441394052, 13.322311151, 14.205496177, 15.095365482, 16, 16, 16, 16], degree=3))
            add(Edge.make_bspline(
                [(-73.02273257, -40.388152964), (-73.081895072, -40.39093521), (-73.199925692, -40.396485859), (-73.3736414, -40.438686775), (-73.541075629, -40.508726152), (-73.700059811, -40.604856525), (-73.845611274, -40.724738389), (-73.976406445, -40.862703865), (-74.084229706, -41.022506322), (-74.158794458, -41.169475897), (-74.209659091, -41.299681811), (-74.243541433, -41.411106059), (-74.272231733, -41.535850429), (-74.298924055, -41.672405015), (-74.321641341, -41.821799159), (-74.340585783, -41.98387009), (-74.355744213, -42.158650688), (-74.362513486, -42.279647517), (-74.366001801, -42.341999118)],
                knots=[0, 0, 0, 0, 1.070505987, 2.135685285, 3.216438728, 4.346150463, 5.486482244, 6.621737109, 7.7759408, 8.963942283, 9.59839197, 10.305095457, 11.070459627, 11.915156775, 12.823989992, 13.805807174, 14.869297358, 16, 16, 16, 16], degree=3))
            Line((-74.366001801, -42.341999118), (-75.017283852, -42.341999118))
            add(Edge.make_bspline(
                [(-75.017283852, -42.341999118), (-75.018809153, -42.263466821), (-75.021795797, -42.109695136), (-75.050669999, -41.884479267), (-75.097024447, -41.670033169), (-75.16325695, -41.469439558), (-75.24127084, -41.286958717), (-75.331413736, -41.128005999), (-75.433440936, -40.996765899), (-75.545399019, -40.891867311), (-75.664822791, -40.812137014), (-75.790055878, -40.75479729), (-75.921594744, -40.720622764), (-76.011397636, -40.716078263), (-76.056536657, -40.713793989)],
                knots=[0, 0, 0, 0, 1.322091412, 2.58874672, 3.817242262, 5.011895168, 6.140903042, 7.155122731, 8.080855046, 8.929742606, 9.727943956, 10.488587771, 11.240295418, 12, 12, 12, 12], degree=3))
            add(Edge.make_bspline(
                [(-76.056536657, -40.713793989), (-76.089703227, -40.714529395), (-76.155686544, -40.715992449), (-76.252389139, -40.735176783), (-76.346131292, -40.762679558), (-76.435844182, -40.802610281), (-76.521711422, -40.85434671), (-76.604674968, -40.916751009), (-76.683662816, -40.991601722), (-76.75908247, -41.075435333), (-76.827693483, -41.168266491), (-76.887739473, -41.267929765), (-76.938677009, -41.37402103), (-76.980820221, -41.485860698), (-77.012486847, -41.603969954), (-77.03523311, -41.727750359), (-77.049452113, -41.857450016), (-77.051499485, -41.945935793), (-77.052540263, -41.990917387)],
                knots=[0, 0, 0, 0, 0.884325644, 1.759323928, 2.622595547, 3.489424008, 4.37295195, 5.294616785, 6.255907374, 7.274251867, 8.302369084, 9.333474657, 10.37669385, 11.44084034, 12.520297356, 13.637342342, 14.798947025, 16, 16, 16, 16], degree=3))
            add(Edge.make_bspline(
                [(-77.052540263, -41.990917387), (-77.050015934, -42.063219699), (-77.045085334, -42.20444293), (-77.001899867, -42.408032851), (-76.932996773, -42.597297928), (-76.850749723, -42.741966652), (-76.76955965, -42.848796465), (-76.698653035, -42.925136053), (-76.619853483, -43.000103265), (-76.528307574, -43.068766136), (-76.430214969, -43.138206065), (-76.320589147, -43.201424055), (-76.202289746, -43.262855211), (-76.118659094, -43.299871265), (-76.075617186, -43.318922194)],
                knots=[0, 0, 0, 0, 1.472543308, 2.876219568, 4.221790263, 5.565193594, 6.249813518, 6.953379497, 7.687249741, 8.463570142, 9.283606569, 10.136032583, 11.040678096, 12, 12, 12, 12], degree=3))
        make_face()
    extrude(amount=-CUT_EXTRUDE2_DEPTH, mode=Mode.SUBTRACT)

    # Sketch6 → Cut-Extrude3 (cut)
    with BuildSketch(Plane(origin=(0, -37.552161083, 0), x_dir=(1, 0, 0), z_dir=(0, 1, 0))):
        with Locations(Location((54.852102372, -111.954877944, 0), (0, 0, 270))):
            Circle(SKETCH6_R)
        with Locations(Location((92.51584965, -111.954877944, 0), (0, 0, 270))):
            Circle(SKETCH6_R)
    extrude(amount=-CUT_EXTRUDE3_DEPTH, mode=Mode.SUBTRACT)


solid = part.part
